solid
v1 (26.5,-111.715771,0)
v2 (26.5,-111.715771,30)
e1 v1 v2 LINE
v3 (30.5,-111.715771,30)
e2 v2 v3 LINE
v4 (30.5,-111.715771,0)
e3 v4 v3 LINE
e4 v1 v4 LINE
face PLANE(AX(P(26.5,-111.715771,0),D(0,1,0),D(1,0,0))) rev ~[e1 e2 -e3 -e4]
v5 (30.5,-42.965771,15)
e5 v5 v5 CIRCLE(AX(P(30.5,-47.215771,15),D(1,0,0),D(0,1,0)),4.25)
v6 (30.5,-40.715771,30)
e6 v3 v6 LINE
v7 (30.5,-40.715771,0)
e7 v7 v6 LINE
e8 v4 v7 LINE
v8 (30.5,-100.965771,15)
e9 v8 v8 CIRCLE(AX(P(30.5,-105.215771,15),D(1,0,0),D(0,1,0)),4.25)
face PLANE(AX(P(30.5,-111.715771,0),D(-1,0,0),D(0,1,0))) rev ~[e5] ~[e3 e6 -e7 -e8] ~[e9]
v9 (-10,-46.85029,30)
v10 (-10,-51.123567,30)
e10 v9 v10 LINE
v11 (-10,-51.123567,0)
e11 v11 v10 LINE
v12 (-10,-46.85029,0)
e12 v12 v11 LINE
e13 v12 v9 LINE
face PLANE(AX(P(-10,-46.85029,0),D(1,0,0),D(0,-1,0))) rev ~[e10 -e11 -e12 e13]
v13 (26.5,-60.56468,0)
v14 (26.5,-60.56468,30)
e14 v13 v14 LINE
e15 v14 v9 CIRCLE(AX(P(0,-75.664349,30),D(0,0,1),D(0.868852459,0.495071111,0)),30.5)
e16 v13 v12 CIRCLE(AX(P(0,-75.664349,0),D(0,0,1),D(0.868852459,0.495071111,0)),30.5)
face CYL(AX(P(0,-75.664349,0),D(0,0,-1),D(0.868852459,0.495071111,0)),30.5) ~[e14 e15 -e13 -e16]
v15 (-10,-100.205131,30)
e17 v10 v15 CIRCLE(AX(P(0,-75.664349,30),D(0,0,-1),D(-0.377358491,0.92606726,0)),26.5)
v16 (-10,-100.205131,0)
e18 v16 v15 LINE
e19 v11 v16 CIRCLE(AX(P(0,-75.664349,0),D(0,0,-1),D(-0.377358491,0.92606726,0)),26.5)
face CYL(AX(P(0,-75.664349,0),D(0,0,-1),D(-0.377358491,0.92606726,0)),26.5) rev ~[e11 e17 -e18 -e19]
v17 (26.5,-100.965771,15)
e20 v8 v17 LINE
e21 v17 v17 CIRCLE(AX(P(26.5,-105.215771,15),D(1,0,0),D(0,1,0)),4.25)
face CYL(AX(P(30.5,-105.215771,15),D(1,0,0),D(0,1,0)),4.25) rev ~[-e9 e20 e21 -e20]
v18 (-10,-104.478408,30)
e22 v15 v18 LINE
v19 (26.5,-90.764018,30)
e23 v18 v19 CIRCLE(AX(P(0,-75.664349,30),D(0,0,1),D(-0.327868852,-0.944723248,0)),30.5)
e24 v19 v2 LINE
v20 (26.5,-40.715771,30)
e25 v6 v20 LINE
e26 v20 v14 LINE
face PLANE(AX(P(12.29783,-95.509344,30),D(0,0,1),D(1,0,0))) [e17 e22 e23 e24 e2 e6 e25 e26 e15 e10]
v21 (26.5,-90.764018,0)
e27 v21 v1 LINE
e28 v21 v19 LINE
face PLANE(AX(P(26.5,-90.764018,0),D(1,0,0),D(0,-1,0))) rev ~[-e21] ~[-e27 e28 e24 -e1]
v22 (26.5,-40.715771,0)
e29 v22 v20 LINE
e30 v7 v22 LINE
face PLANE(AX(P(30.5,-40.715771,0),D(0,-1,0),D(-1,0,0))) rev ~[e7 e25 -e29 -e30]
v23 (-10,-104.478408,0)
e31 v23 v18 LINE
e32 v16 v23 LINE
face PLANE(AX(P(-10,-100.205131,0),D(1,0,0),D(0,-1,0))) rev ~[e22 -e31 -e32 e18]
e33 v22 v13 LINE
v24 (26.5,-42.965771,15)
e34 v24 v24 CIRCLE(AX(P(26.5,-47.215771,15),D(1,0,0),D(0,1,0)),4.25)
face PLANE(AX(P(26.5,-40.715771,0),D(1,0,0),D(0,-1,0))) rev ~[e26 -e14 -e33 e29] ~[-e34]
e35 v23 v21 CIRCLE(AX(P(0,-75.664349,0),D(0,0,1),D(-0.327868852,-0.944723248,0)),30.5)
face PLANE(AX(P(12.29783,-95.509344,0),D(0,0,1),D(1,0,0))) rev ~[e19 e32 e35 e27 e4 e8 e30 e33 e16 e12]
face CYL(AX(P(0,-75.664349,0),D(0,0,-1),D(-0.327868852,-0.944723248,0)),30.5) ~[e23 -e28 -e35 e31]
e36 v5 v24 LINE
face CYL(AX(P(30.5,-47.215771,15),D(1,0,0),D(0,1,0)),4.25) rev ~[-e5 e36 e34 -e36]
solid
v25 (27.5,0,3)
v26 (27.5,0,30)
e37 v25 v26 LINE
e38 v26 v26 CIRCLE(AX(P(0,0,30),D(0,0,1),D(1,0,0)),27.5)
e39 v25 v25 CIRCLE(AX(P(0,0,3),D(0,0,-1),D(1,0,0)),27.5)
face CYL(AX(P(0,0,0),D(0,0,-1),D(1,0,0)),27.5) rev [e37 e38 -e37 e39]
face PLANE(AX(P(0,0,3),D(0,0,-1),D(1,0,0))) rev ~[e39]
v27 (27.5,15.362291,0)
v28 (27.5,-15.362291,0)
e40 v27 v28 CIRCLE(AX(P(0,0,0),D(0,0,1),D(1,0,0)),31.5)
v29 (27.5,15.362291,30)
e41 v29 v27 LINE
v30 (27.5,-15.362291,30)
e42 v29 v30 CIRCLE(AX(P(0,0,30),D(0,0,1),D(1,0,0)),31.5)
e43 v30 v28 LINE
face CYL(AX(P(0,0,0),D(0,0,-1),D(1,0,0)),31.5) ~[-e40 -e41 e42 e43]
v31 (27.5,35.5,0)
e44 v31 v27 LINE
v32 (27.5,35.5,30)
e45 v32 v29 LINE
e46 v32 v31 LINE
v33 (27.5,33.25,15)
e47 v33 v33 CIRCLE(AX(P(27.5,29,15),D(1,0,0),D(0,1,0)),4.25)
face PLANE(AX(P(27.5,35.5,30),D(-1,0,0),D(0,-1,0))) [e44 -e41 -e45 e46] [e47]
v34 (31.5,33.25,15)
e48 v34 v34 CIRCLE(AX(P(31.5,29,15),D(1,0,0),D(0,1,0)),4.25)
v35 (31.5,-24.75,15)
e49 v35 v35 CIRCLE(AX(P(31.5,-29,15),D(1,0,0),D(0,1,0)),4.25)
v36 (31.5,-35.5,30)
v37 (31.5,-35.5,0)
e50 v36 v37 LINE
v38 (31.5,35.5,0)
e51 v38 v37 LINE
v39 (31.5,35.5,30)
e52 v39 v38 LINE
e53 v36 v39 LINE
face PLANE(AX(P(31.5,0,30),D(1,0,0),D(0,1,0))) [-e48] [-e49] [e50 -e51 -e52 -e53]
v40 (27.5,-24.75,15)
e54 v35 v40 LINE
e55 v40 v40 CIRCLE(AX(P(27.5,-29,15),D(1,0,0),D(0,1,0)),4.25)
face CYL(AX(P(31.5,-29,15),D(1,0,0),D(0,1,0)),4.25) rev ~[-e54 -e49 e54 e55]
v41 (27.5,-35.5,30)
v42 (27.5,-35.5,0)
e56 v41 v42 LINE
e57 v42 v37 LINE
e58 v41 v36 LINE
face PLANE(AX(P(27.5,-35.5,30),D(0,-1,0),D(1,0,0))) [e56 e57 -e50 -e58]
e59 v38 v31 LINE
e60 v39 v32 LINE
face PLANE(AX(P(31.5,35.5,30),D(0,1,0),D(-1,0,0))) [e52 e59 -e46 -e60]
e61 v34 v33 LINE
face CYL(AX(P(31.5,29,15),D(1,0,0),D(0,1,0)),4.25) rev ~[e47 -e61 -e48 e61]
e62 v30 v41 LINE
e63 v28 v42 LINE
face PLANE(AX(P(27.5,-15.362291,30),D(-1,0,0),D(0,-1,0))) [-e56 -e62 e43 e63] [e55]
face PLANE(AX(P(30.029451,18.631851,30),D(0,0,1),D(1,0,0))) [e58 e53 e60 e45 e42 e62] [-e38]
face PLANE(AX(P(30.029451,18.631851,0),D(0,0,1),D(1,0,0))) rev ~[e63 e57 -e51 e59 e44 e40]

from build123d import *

# Parameters (mm, degrees)
F0_R      = 31.5
F0_R_2    = 27.5
F1_DEPTH  = 30
F2_R      = 31.5
F2_R_2    = 27.5
F3_DEPTH  = 3
F5_DEPTH  = 30
F6_R      = 4.25
F7_DEPTH  = 5
F9_DEPTH  = 30
F10_R     = 4.25
F11_DEPTH = 5


# Not quite as in the source:
# - a feature names something its author has since deleted; it is built from what else it names


with BuildPart() as f1:
    # F0 (on Top) → F1 (new body)
    with BuildSketch(Plane.XY):
        Circle(F0_R)
        Circle(F0_R_2, mode=Mode.SUBTRACT)
    extrude(amount=F1_DEPTH)

    # F2 (on face) → F3 (join)
    with BuildSketch(Plane(origin=(0, 0, 0), x_dir=(1, 0, 0), z_dir=(0, 0, -1))):
        Circle(F2_R)
        Circle(F2_R_2, mode=Mode.SUBTRACT)
        Circle(F2_R_2)
    extrude(amount=-F3_DEPTH)

    # F4 (on face) → F5 (join)
    with BuildSketch(Plane.XY.offset(30)):
        with BuildLine():
            Line((27.5, 35.5), (27.5, 15.3622914957))
            ThreePointArc((27.5, 15.3622914957), (30.4836021494, 7.9372539332), (31.5, 0))
            Line((31.5, 0), (31.5, 35.5))
            Line((31.5, 35.5), (27.5, 35.5))
        make_face()
        with BuildLine():
            ThreePointArc((31.5, 0), (30.4836021494, -7.9372539332), (27.5, -15.3622914957))
            Line((27.5, -15.3622914957), (27.5, -35.5))
            Line((27.5, -35.5), (31.5, -35.5))
            Line((31.5, -35.5), (31.5, 0))
        make_face()
    extrude(amount=-F5_DEPTH)

    # F6 (on face) → F7 (cut)
    with BuildSketch(Plane.YZ.offset(31.5)):
        with Locations((29, 15)):
            Circle(F6_R)
        with Locations((-29, 15)):
            Circle(F6_R)
    extrude(amount=-F7_DEPTH, mode=Mode.SUBTRACT)


with BuildPart() as f9:
    # F8 (on Top) → F9 (new body)
    with BuildSketch(Plane.XY):
        with BuildLine():
            Line((26.5, -76.2157712579), (26.5, -75.6643489003))
            ThreePointArc((26.5, -75.6643489003), (14.7859730826, -97.6558245216), (-10, -100.2051312839))
            Line((-10, -100.2051312839), (-10, -104.4784079688))
            ThreePointArc((-10, -104.4784079688), (10.7277036045, -104.2154675365), (26.5, -90.7640177709))
            Line((26.5, -90.7640177709), (26.5, -76.2157712579))
        make_face()
        with BuildLine():
            Line((26.5, -60.5646800298), (26.5, -75.6643489003))
            Line((26.5, -75.6643489003), (26.5, -76.2157712579))
            Line((26.5, -76.2157712579), (26.5, -90.7640177709))
            ThreePointArc((26.5, -90.7640177709), (29.4830459756, -83.4745985762), (30.5, -75.6643489003))
            ThreePointArc((30.5, -75.6643489003), (29.4830459756, -67.8540992244), (26.5, -60.5646800298))
        make_face()
        with BuildLine():
            ThreePointArc((-10, -51.1235665167), (14.7859730826, -53.6728732791), (26.5, -75.6643489003))
            Line((26.5, -75.6643489003), (26.5, -60.5646800298))
            ThreePointArc((26.5, -60.5646800298), (10.7277036045, -47.1132302642), (-10, -46.8502898319))
            Line((-10, -46.8502898319), (-10, -51.1235665167))
        make_face()
        with BuildLine():
            Line((26.5, -40.7157712579), (26.5, -60.5646800298))
            ThreePointArc((26.5, -60.5646800298), (29.4830459756, -67.8540992244), (30.5, -75.6643489003))
            Line((30.5, -75.6643489003), (30.5, -40.7157712579))
            Line((30.5, -40.7157712579), (26.5, -40.7157712579))
        make_face()
        with BuildLine():
            ThreePointArc((30.5, -75.6643489003), (29.4830459756, -83.4745985762), (26.5, -90.7640177709))
            Line((26.5, -90.7640177709), (26.5, -111.7157712579))
            Line((26.5, -111.7157712579), (30.5, -111.7157712579))
            Line((30.5, -111.7157712579), (30.5, -75.6643489003))
        make_face()
    extrude(amount=F9_DEPTH)

    # F10 (on face) → F11 (cut)
    with BuildSketch(Plane.YZ.offset(30.5)):
        with Locations((-105.2157712579, 15)):
            Circle(F10_R)
        with Locations((-47.2157712579, 15)):
            Circle(F10_R)
    extrude(amount=-F11_DEPTH, mode=Mode.SUBTRACT)


solid = Compound([f1.part, f9.part])
